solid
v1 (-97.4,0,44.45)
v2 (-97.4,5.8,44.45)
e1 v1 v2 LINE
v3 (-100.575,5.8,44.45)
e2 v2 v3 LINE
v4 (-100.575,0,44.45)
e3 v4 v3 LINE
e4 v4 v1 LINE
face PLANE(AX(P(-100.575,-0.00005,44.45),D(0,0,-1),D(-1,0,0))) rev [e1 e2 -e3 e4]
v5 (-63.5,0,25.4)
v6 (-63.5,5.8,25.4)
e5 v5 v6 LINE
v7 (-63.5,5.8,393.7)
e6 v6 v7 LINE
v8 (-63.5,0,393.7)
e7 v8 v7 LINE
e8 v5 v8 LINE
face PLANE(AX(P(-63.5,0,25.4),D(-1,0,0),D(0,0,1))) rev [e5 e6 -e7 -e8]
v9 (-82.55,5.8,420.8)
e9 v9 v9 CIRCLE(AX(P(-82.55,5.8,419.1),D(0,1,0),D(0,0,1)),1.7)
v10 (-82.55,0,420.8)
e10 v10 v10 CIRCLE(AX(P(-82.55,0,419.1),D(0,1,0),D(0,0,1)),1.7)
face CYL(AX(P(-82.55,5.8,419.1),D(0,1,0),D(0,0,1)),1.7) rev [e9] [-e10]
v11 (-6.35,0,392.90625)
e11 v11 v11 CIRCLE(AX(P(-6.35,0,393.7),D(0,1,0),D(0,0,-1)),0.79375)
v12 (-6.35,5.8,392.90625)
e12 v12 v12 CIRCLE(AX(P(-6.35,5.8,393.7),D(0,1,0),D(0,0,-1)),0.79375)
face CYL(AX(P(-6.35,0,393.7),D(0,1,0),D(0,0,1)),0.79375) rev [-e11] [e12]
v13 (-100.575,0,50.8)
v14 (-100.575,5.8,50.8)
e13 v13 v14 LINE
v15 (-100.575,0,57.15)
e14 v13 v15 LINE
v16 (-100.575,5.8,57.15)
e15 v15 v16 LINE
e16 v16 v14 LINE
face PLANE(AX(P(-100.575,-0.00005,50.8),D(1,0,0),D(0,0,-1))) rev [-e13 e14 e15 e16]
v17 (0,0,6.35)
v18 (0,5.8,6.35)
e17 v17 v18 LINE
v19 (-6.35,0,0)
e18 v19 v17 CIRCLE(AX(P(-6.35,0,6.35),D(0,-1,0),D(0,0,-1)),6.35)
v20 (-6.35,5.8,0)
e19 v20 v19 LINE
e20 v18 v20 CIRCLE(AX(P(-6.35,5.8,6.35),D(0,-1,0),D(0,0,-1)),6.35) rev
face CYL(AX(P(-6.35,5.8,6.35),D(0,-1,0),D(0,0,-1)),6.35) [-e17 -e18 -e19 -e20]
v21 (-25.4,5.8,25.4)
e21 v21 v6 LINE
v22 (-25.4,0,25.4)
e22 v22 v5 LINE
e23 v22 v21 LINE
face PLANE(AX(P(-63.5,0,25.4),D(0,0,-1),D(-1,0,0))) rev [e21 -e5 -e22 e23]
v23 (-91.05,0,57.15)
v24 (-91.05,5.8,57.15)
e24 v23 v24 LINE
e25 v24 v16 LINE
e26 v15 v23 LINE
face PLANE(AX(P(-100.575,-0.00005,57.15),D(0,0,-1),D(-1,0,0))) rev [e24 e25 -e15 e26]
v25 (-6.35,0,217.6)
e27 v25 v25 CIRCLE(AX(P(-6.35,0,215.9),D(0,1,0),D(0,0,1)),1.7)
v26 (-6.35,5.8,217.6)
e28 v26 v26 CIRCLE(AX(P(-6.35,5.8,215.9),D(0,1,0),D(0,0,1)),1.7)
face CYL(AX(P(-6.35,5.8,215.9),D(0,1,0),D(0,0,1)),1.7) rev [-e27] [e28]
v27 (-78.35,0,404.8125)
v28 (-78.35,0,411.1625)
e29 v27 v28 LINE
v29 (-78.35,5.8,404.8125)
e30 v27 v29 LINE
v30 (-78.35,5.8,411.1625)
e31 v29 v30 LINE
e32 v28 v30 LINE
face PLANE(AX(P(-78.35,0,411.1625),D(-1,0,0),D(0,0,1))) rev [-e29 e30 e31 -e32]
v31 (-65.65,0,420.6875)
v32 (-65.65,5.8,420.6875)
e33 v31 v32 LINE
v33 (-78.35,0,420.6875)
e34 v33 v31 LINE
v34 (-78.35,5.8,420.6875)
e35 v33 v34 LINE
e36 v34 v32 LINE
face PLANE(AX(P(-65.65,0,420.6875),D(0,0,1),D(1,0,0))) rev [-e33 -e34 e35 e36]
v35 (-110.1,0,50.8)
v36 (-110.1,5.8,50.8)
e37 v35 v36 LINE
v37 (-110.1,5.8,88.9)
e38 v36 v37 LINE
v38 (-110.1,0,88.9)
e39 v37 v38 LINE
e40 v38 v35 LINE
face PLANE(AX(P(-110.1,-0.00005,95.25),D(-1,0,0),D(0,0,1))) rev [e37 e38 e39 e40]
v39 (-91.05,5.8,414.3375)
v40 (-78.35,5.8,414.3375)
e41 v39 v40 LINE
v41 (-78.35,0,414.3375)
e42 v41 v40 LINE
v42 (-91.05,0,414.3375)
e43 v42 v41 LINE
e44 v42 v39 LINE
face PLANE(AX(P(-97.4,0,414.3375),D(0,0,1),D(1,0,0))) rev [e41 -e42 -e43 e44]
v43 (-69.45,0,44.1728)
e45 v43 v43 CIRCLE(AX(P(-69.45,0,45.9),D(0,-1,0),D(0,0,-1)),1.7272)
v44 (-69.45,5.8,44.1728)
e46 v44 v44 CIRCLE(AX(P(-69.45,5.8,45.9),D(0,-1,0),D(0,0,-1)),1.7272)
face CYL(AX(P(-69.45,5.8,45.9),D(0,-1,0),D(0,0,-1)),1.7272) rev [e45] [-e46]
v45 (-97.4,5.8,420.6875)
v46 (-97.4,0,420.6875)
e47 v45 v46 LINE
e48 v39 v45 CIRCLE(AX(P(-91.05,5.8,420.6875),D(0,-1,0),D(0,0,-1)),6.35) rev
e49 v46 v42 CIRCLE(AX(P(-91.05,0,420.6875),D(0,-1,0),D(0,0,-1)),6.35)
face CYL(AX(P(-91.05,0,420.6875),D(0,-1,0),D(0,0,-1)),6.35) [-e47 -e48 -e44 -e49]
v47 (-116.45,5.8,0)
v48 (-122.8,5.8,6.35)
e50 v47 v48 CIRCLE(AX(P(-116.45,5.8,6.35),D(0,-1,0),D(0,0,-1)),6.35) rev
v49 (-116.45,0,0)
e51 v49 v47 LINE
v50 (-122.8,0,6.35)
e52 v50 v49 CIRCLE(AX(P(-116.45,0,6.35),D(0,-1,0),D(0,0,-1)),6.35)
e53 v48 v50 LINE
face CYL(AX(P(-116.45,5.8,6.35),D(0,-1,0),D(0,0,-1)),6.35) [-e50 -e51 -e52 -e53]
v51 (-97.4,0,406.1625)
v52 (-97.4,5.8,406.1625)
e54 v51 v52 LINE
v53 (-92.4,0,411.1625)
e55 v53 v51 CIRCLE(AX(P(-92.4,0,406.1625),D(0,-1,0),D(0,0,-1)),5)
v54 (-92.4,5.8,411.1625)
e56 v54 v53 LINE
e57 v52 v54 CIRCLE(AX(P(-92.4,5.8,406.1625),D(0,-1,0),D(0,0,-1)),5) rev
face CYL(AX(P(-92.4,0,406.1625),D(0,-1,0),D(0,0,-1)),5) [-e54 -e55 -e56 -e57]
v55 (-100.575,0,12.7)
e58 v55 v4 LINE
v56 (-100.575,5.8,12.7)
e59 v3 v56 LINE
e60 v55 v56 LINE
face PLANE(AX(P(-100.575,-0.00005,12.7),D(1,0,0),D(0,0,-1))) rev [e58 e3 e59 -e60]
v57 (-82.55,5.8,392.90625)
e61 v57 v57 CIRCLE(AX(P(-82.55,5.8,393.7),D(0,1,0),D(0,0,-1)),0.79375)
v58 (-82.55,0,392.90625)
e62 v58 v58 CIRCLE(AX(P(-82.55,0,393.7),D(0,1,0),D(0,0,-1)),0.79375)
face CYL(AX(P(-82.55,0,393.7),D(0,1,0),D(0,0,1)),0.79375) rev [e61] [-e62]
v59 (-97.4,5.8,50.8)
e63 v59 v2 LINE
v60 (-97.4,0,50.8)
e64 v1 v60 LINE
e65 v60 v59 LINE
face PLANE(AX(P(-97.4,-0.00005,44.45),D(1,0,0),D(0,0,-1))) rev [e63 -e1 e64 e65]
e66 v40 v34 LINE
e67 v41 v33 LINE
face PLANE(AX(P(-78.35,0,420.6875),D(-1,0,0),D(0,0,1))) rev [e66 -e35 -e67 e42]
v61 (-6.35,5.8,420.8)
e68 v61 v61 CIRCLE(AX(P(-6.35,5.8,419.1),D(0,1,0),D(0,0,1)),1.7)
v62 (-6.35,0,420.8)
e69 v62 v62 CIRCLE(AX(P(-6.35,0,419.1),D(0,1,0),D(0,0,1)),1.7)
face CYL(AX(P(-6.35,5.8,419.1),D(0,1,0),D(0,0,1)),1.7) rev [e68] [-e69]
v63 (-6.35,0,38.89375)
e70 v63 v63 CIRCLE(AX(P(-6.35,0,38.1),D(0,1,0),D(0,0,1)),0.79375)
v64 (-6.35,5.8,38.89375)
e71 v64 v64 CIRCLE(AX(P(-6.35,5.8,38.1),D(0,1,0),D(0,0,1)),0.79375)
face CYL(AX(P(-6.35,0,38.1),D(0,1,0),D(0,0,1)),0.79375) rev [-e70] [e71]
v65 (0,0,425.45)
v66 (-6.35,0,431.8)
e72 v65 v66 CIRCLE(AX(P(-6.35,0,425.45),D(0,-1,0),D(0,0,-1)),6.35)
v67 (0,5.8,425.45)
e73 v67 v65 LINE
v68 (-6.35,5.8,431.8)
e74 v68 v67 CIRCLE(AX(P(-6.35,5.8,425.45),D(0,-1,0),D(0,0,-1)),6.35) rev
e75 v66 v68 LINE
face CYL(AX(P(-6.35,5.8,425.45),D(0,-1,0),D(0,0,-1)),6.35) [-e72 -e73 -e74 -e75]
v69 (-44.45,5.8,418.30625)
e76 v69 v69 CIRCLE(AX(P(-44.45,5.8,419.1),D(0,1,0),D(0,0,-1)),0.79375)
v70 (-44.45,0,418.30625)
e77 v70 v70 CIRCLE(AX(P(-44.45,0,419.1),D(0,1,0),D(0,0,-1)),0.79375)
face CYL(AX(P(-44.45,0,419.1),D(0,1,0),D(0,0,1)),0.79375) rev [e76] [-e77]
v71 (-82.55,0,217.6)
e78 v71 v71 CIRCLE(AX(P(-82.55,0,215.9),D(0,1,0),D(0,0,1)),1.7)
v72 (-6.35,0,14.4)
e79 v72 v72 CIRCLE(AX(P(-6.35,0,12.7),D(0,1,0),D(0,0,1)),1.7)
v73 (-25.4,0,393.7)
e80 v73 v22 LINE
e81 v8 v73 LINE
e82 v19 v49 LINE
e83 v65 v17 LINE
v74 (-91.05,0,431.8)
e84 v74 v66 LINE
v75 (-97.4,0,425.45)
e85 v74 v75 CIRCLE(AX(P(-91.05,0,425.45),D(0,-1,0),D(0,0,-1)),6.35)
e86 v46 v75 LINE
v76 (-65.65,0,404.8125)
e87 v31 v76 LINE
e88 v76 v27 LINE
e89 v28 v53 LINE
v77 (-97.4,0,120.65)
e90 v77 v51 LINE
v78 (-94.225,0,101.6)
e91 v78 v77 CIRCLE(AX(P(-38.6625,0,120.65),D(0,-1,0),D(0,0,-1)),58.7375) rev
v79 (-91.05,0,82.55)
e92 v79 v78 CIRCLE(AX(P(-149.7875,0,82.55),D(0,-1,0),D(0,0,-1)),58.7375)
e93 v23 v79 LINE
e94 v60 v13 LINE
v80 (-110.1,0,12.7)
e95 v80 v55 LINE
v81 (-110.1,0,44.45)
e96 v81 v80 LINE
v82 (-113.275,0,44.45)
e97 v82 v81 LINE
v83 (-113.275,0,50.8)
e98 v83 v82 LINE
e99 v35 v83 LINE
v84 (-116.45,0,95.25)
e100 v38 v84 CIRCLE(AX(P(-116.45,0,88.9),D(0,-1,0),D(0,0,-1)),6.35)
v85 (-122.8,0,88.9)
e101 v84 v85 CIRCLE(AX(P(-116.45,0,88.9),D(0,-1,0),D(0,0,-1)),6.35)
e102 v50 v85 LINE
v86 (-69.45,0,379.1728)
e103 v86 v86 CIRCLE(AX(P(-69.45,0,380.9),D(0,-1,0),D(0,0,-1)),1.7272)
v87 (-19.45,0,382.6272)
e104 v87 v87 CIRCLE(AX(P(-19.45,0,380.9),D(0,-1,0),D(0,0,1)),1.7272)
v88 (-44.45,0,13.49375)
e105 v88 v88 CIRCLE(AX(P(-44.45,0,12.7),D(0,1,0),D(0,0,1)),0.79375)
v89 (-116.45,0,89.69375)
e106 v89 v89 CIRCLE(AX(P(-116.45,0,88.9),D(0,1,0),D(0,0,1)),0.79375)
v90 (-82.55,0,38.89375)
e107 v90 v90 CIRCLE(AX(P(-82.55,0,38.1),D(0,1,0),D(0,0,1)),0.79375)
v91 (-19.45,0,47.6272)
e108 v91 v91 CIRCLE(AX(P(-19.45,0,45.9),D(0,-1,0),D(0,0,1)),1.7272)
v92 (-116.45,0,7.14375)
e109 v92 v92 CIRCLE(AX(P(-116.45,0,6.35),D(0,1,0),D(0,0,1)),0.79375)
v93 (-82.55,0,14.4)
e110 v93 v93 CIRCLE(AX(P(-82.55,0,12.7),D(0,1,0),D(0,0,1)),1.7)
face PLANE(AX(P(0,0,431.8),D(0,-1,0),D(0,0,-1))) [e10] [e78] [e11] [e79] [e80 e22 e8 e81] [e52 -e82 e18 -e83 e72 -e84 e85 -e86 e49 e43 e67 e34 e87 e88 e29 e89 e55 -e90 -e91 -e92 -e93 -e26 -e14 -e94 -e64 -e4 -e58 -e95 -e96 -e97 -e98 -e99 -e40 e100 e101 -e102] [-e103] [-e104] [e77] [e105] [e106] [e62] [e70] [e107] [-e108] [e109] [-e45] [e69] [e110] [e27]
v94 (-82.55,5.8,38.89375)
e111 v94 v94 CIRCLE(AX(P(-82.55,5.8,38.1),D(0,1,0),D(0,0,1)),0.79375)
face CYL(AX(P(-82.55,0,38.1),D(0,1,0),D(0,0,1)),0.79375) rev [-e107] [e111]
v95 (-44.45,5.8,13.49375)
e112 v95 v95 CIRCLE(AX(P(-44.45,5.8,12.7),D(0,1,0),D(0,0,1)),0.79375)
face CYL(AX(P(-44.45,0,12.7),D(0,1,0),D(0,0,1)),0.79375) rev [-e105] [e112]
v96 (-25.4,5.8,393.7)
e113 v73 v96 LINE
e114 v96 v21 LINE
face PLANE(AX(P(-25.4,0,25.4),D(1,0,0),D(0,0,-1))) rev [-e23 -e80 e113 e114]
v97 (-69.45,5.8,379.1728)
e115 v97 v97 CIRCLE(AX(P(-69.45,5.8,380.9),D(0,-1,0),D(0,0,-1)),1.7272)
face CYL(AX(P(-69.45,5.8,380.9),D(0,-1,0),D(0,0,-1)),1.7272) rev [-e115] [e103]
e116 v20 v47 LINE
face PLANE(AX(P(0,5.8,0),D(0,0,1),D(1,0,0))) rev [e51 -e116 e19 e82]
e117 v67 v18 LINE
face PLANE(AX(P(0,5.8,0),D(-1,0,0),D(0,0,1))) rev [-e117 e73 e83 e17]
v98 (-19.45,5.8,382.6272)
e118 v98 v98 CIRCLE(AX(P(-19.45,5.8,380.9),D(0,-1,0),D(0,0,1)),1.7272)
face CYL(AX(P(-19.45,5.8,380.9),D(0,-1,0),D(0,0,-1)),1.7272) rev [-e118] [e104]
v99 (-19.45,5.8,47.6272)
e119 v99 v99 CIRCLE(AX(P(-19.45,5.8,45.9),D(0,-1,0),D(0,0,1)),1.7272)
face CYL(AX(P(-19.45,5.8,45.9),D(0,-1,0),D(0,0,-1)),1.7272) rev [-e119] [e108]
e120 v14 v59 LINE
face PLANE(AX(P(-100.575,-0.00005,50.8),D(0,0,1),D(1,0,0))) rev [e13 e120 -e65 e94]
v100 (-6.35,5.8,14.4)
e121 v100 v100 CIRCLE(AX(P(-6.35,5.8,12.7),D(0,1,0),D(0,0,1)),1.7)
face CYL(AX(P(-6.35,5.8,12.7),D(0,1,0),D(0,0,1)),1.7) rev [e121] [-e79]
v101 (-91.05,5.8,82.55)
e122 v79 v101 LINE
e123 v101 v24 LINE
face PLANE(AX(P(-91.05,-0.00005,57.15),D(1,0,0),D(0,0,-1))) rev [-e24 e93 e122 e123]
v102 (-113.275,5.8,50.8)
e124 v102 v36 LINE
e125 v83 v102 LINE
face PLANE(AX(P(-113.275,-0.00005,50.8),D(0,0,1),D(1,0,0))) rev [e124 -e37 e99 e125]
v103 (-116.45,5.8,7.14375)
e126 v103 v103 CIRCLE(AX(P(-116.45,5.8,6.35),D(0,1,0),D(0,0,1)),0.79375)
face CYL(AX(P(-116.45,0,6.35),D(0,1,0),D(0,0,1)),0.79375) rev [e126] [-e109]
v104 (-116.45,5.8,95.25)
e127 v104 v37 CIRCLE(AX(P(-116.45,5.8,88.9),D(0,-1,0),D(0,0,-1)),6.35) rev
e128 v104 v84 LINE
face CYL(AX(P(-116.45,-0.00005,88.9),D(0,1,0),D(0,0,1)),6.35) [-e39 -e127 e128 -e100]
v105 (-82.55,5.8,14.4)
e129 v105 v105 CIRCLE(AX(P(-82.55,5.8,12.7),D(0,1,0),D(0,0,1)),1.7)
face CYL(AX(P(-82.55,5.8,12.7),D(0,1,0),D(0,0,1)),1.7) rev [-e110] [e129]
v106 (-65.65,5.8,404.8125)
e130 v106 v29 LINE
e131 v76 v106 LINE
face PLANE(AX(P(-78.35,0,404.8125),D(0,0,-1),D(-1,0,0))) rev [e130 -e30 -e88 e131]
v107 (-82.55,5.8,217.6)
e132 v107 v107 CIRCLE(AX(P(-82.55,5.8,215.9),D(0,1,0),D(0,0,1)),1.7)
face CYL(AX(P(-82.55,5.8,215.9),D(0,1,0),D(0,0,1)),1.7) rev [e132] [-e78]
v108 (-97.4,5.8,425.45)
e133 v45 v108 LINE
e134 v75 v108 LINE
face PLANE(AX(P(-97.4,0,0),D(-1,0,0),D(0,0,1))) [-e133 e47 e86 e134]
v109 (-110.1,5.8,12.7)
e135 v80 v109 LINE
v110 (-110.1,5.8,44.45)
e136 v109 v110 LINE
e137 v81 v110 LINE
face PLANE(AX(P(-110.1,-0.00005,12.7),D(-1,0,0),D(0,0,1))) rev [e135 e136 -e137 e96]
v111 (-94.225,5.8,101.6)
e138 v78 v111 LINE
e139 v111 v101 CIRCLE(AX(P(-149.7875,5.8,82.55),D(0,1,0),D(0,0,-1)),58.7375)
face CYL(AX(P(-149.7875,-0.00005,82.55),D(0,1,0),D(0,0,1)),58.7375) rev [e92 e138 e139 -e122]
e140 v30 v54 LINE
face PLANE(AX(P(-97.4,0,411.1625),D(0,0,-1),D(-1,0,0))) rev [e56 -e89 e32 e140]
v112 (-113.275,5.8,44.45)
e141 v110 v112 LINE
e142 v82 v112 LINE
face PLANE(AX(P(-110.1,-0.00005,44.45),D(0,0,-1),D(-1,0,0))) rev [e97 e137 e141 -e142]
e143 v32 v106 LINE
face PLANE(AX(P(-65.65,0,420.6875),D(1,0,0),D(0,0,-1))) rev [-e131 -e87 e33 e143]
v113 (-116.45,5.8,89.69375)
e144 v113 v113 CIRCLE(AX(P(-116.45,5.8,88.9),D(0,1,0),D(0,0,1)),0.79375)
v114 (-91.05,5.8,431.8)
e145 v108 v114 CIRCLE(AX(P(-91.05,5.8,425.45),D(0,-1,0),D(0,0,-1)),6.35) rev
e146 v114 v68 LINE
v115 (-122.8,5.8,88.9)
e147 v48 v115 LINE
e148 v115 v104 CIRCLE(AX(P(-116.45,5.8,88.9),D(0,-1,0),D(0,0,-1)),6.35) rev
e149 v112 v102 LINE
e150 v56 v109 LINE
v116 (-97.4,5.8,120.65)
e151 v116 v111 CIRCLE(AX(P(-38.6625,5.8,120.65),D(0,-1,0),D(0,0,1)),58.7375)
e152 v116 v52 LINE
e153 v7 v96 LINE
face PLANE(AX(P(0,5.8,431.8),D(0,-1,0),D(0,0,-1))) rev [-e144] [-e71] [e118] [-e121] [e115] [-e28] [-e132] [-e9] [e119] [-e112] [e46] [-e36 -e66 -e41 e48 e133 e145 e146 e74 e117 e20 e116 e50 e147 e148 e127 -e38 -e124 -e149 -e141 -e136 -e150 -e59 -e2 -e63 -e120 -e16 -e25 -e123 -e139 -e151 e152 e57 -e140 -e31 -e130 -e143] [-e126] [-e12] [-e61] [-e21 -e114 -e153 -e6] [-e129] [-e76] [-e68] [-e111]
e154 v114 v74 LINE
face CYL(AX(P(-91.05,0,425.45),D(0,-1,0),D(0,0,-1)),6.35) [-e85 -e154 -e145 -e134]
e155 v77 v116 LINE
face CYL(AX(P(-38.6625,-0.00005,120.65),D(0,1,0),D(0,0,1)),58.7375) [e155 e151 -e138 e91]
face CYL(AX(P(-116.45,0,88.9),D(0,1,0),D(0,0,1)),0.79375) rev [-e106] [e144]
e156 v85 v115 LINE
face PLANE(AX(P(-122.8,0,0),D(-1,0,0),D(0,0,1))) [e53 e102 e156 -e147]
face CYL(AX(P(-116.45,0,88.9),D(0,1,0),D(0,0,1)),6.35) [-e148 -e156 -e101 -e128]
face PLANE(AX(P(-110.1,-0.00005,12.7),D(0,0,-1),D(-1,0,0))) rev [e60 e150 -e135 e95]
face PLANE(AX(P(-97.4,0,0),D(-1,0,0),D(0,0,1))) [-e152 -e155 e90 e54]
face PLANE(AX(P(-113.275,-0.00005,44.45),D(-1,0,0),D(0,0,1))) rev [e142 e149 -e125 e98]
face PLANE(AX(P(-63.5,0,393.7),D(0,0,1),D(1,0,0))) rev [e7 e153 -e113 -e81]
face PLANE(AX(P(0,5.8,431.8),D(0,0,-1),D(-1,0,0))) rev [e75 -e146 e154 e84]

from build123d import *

# Parameters (mm, degrees)
SKETCH1_W            = 88.9
SKETCH1_H            = 431.8
BOSS_EXTRUDE1_DEPTH  = 5.8
M3_CLEARANCE_HOLE1_D = 3.4
SKETCH2_W            = 38.1
SKETCH2_H            = 368.3
CUT_EXTRUDE1_DEPTH   = 441.89464728
SKETCH3_W            = 8.5
SKETCH3_H            = 431.8
BOSS_EXTRUDE2_DEPTH  = 5.8
SKETCH7_R            = 0.79375
CUT_EXTRUDE2_DEPTH   = 443.68684191
SKETCH9_W            = 25.4
SKETCH9_H            = 95.25
BOSS_EXTRUDE3_DEPTH  = 5.8
CUT_EXTRUDE3_DEPTH   = 449.959597291
SKETCH10_R           = 0.79375
CUT_EXTRUDE4_DEPTH   = 449.959597291
CUT_EXTRUDE5_DEPTH   = 449.959597291
FILLET1_R            = 5
FILLET2_R            = 6.35
SKETCH12_R           = 1.7272
CUT_EXTRUDE6_DEPTH   = 449.959597291


with BuildPart() as part:
    # Sketch1 → Boss-Extrude1 (new body)
    with BuildSketch(Plane(origin=(0, 0, 0), x_dir=(1, 0, 0), z_dir=(0, 1, 0))):
        with Locations((-44.45, -215.9)):
            Rectangle(SKETCH1_W, SKETCH1_H)
    extrude(amount=BOSS_EXTRUDE1_DEPTH)

    # M3 Clearance Hole1 (through all)
    with Locations(Plane(origin=(0, 5.8, 0), x_dir=(-1, 0, 0), z_dir=(0, 1, 0))):
        with Locations((82.55, 12.7), (6.35, 12.7), (6.35, 419.1), (82.55, 419.1), (82.55, 215.9), (6.35, 215.9)):
            Hole(M3_CLEARANCE_HOLE1_D / 2)

    # Sketch2 → Cut-Extrude1 (cut, through all)
    with BuildSketch(Plane(origin=(0, 5.8, 0), x_dir=(1, 0, 0), z_dir=(0, 1, 0))):
        with Locations((-44.45, -209.55)):
            Rectangle(SKETCH2_W, SKETCH2_H)
    extrude(amount=-CUT_EXTRUDE1_DEPTH, mode=Mode.SUBTRACT)

    # Sketch3 → Boss-Extrude2 (add, through all)
    with BuildSketch(Plane(origin=(0, 5.8, 0), x_dir=(-1, 0, 0), z_dir=(0, 1, 0))):
        with Locations((93.15, 215.9)):
            Rectangle(SKETCH3_W, SKETCH3_H)
    extrude(amount=-BOSS_EXTRUDE2_DEPTH)

    # Sketch7 → Cut-Extrude2 (cut, through all)
    with BuildSketch(Plane(origin=(0, 5.8, 0), x_dir=(1, 0, 0), z_dir=(0, 1, 0))):
        with Locations(Location((-44.45, -12.7, 0), (0, 0, 270))):
            Circle(SKETCH7_R)
        with Locations(Location((-82.55, -38.1, 0), (0, 0, 270))):
            Circle(SKETCH7_R)
        with Locations(Location((-6.35, -38.1, 0), (0, 0, 270))):
            Circle(SKETCH7_R)
        with Locations(Location((-6.35, -393.7, 0), (0, 0, 90))):
            Circle(SKETCH7_R)
        with Locations(Location((-82.55, -393.7, 0), (0, 0, 90))):
            Circle(SKETCH7_R)
        with Locations(Location((-44.45, -419.1, 0), (0, 0, 90))):
            Circle(SKETCH7_R)
    extrude(amount=-CUT_EXTRUDE2_DEPTH, mode=Mode.SUBTRACT)

    # Sketch9 → Boss-Extrude3 (add, through all)
    with BuildSketch(Plane(origin=(0, 5.8, 0), x_dir=(1, 0, 0), z_dir=(0, 1, 0))):
        with Locations((-110.1, -47.625)):
            Rectangle(SKETCH9_W, SKETCH9_H)
    extrude(amount=-BOSS_EXTRUDE3_DEPTH)

    # Sketch8 → Cut-Extrude3 (cut, through all)
    with BuildSketch(Plane(origin=(0, 5.8, 0), x_dir=(1, 0, 0), z_dir=(0, 1, 0))):
        with BuildLine():
            Line((-110.1, -44.45), (-113.275, -44.45))
            Line((-113.275, -44.45), (-113.275, -50.8))
            Line((-113.275, -50.8), (-110.1, -50.8))
            Line((-110.1, -50.8), (-110.1, -95.25))
            Line((-110.1, -95.25), (-97.4, -95.25))
            Line((-97.4, -95.25), (-97.4, -120.65))
            ThreePointArc((-97.4, -120.65), (-96.600813101, -110.993614483), (-94.225, -101.6))
            ThreePointArc((-94.225, -101.6), (-91.849186899, -92.206385517), (-91.05, -82.55))
            Line((-91.05, -82.55), (-91.05, -57.15))
            Line((-91.05, -57.15), (-100.575, -57.15))
            Line((-100.575, -57.15), (-100.575, -50.8))
            Line((-100.575, -50.8), (-97.4, -50.8))
            Line((-97.4, -50.8), (-97.4, -44.45))
            Line((-97.4, -44.45), (-100.575, -44.45))
            Line((-100.575, -44.45), (-100.575, -12.7))
            Line((-100.575, -12.7), (-110.1, -12.7))
            Line((-110.1, -12.7), (-110.1, -44.45))
        make_face()
    extrude(amount=-CUT_EXTRUDE3_DEPTH, mode=Mode.SUBTRACT)

    # Sketch10 → Cut-Extrude4 (cut, through all)
    with BuildSketch(Plane(origin=(0, 5.8, 0), x_dir=(1, 0, 0), z_dir=(0, 1, 0))):
        with Locations(Location((-116.45, -88.9, 0), (0, 0, 270))):
            Circle(SKETCH10_R)
        with Locations(Location((-116.45, -6.35, 0), (0, 0, 270))):
            Circle(SKETCH10_R)
    extrude(amount=-CUT_EXTRUDE4_DEPTH, mode=Mode.SUBTRACT)

    # Sketch11 → Cut-Extrude5 (cut, through all)
    with BuildSketch(Plane(origin=(0, 5.8, 0), x_dir=(1, 0, 0), z_dir=(0, 1, 0))):
        Polygon((-97.4, -414.3375), (-78.35, -414.3375), (-78.35, -420.6875), (-65.65, -420.6875), (-65.65, -404.8125), (-78.35, -404.8125), (-78.35, -411.1625), (-97.4, -411.1625), align=None)
    extrude(amount=-CUT_EXTRUDE5_DEPTH, mode=Mode.SUBTRACT)

    # Fillet1
    fillet1_edges = [part.edges().sort_by_distance(p)[0] for p in [
        (-97.4, 2.9, 411.1625),
    ]]
    fillet(fillet1_edges, radius=FILLET1_R)

    # Fillet2
    fillet2_edges = [part.edges().sort_by_distance(p)[0] for p in [
        (0, 2.9, 431.8),
        (-97.4, 2.9, 414.3375),
        (-97.4, 2.9, 431.8),
        (-122.8, 2.9, 95.25),
        (0, 2.9, 0),
        (-122.8, 2.9, 0),
        (-110.1, 2.9, 95.25),
    ]]
    fillet(fillet2_edges, radius=FILLET2_R - 0.0001)  # a hair under: the kernel refuses the full size

    # Sketch12 → Cut-Extrude6 (cut, through all)
    with BuildSketch(Plane.XZ):
        with Locations(Location((-69.45, 380.9, 0), (0, 0, 270))):
            Circle(SKETCH12_R)
        with Locations(Location((-19.45, 380.9, 0), (0, 0, 90))):
            Circle(SKETCH12_R)
        with Locations(Location((-69.45, 45.9, 0), (0, 0, 270))):
            Circle(SKETCH12_R)
        with Locations(Location((-19.45, 45.9, 0), (0, 0, 90))):
            Circle(SKETCH12_R)
    extrude(amount=-CUT_EXTRUDE6_DEPTH, mode=Mode.SUBTRACT)


solid = part.part
